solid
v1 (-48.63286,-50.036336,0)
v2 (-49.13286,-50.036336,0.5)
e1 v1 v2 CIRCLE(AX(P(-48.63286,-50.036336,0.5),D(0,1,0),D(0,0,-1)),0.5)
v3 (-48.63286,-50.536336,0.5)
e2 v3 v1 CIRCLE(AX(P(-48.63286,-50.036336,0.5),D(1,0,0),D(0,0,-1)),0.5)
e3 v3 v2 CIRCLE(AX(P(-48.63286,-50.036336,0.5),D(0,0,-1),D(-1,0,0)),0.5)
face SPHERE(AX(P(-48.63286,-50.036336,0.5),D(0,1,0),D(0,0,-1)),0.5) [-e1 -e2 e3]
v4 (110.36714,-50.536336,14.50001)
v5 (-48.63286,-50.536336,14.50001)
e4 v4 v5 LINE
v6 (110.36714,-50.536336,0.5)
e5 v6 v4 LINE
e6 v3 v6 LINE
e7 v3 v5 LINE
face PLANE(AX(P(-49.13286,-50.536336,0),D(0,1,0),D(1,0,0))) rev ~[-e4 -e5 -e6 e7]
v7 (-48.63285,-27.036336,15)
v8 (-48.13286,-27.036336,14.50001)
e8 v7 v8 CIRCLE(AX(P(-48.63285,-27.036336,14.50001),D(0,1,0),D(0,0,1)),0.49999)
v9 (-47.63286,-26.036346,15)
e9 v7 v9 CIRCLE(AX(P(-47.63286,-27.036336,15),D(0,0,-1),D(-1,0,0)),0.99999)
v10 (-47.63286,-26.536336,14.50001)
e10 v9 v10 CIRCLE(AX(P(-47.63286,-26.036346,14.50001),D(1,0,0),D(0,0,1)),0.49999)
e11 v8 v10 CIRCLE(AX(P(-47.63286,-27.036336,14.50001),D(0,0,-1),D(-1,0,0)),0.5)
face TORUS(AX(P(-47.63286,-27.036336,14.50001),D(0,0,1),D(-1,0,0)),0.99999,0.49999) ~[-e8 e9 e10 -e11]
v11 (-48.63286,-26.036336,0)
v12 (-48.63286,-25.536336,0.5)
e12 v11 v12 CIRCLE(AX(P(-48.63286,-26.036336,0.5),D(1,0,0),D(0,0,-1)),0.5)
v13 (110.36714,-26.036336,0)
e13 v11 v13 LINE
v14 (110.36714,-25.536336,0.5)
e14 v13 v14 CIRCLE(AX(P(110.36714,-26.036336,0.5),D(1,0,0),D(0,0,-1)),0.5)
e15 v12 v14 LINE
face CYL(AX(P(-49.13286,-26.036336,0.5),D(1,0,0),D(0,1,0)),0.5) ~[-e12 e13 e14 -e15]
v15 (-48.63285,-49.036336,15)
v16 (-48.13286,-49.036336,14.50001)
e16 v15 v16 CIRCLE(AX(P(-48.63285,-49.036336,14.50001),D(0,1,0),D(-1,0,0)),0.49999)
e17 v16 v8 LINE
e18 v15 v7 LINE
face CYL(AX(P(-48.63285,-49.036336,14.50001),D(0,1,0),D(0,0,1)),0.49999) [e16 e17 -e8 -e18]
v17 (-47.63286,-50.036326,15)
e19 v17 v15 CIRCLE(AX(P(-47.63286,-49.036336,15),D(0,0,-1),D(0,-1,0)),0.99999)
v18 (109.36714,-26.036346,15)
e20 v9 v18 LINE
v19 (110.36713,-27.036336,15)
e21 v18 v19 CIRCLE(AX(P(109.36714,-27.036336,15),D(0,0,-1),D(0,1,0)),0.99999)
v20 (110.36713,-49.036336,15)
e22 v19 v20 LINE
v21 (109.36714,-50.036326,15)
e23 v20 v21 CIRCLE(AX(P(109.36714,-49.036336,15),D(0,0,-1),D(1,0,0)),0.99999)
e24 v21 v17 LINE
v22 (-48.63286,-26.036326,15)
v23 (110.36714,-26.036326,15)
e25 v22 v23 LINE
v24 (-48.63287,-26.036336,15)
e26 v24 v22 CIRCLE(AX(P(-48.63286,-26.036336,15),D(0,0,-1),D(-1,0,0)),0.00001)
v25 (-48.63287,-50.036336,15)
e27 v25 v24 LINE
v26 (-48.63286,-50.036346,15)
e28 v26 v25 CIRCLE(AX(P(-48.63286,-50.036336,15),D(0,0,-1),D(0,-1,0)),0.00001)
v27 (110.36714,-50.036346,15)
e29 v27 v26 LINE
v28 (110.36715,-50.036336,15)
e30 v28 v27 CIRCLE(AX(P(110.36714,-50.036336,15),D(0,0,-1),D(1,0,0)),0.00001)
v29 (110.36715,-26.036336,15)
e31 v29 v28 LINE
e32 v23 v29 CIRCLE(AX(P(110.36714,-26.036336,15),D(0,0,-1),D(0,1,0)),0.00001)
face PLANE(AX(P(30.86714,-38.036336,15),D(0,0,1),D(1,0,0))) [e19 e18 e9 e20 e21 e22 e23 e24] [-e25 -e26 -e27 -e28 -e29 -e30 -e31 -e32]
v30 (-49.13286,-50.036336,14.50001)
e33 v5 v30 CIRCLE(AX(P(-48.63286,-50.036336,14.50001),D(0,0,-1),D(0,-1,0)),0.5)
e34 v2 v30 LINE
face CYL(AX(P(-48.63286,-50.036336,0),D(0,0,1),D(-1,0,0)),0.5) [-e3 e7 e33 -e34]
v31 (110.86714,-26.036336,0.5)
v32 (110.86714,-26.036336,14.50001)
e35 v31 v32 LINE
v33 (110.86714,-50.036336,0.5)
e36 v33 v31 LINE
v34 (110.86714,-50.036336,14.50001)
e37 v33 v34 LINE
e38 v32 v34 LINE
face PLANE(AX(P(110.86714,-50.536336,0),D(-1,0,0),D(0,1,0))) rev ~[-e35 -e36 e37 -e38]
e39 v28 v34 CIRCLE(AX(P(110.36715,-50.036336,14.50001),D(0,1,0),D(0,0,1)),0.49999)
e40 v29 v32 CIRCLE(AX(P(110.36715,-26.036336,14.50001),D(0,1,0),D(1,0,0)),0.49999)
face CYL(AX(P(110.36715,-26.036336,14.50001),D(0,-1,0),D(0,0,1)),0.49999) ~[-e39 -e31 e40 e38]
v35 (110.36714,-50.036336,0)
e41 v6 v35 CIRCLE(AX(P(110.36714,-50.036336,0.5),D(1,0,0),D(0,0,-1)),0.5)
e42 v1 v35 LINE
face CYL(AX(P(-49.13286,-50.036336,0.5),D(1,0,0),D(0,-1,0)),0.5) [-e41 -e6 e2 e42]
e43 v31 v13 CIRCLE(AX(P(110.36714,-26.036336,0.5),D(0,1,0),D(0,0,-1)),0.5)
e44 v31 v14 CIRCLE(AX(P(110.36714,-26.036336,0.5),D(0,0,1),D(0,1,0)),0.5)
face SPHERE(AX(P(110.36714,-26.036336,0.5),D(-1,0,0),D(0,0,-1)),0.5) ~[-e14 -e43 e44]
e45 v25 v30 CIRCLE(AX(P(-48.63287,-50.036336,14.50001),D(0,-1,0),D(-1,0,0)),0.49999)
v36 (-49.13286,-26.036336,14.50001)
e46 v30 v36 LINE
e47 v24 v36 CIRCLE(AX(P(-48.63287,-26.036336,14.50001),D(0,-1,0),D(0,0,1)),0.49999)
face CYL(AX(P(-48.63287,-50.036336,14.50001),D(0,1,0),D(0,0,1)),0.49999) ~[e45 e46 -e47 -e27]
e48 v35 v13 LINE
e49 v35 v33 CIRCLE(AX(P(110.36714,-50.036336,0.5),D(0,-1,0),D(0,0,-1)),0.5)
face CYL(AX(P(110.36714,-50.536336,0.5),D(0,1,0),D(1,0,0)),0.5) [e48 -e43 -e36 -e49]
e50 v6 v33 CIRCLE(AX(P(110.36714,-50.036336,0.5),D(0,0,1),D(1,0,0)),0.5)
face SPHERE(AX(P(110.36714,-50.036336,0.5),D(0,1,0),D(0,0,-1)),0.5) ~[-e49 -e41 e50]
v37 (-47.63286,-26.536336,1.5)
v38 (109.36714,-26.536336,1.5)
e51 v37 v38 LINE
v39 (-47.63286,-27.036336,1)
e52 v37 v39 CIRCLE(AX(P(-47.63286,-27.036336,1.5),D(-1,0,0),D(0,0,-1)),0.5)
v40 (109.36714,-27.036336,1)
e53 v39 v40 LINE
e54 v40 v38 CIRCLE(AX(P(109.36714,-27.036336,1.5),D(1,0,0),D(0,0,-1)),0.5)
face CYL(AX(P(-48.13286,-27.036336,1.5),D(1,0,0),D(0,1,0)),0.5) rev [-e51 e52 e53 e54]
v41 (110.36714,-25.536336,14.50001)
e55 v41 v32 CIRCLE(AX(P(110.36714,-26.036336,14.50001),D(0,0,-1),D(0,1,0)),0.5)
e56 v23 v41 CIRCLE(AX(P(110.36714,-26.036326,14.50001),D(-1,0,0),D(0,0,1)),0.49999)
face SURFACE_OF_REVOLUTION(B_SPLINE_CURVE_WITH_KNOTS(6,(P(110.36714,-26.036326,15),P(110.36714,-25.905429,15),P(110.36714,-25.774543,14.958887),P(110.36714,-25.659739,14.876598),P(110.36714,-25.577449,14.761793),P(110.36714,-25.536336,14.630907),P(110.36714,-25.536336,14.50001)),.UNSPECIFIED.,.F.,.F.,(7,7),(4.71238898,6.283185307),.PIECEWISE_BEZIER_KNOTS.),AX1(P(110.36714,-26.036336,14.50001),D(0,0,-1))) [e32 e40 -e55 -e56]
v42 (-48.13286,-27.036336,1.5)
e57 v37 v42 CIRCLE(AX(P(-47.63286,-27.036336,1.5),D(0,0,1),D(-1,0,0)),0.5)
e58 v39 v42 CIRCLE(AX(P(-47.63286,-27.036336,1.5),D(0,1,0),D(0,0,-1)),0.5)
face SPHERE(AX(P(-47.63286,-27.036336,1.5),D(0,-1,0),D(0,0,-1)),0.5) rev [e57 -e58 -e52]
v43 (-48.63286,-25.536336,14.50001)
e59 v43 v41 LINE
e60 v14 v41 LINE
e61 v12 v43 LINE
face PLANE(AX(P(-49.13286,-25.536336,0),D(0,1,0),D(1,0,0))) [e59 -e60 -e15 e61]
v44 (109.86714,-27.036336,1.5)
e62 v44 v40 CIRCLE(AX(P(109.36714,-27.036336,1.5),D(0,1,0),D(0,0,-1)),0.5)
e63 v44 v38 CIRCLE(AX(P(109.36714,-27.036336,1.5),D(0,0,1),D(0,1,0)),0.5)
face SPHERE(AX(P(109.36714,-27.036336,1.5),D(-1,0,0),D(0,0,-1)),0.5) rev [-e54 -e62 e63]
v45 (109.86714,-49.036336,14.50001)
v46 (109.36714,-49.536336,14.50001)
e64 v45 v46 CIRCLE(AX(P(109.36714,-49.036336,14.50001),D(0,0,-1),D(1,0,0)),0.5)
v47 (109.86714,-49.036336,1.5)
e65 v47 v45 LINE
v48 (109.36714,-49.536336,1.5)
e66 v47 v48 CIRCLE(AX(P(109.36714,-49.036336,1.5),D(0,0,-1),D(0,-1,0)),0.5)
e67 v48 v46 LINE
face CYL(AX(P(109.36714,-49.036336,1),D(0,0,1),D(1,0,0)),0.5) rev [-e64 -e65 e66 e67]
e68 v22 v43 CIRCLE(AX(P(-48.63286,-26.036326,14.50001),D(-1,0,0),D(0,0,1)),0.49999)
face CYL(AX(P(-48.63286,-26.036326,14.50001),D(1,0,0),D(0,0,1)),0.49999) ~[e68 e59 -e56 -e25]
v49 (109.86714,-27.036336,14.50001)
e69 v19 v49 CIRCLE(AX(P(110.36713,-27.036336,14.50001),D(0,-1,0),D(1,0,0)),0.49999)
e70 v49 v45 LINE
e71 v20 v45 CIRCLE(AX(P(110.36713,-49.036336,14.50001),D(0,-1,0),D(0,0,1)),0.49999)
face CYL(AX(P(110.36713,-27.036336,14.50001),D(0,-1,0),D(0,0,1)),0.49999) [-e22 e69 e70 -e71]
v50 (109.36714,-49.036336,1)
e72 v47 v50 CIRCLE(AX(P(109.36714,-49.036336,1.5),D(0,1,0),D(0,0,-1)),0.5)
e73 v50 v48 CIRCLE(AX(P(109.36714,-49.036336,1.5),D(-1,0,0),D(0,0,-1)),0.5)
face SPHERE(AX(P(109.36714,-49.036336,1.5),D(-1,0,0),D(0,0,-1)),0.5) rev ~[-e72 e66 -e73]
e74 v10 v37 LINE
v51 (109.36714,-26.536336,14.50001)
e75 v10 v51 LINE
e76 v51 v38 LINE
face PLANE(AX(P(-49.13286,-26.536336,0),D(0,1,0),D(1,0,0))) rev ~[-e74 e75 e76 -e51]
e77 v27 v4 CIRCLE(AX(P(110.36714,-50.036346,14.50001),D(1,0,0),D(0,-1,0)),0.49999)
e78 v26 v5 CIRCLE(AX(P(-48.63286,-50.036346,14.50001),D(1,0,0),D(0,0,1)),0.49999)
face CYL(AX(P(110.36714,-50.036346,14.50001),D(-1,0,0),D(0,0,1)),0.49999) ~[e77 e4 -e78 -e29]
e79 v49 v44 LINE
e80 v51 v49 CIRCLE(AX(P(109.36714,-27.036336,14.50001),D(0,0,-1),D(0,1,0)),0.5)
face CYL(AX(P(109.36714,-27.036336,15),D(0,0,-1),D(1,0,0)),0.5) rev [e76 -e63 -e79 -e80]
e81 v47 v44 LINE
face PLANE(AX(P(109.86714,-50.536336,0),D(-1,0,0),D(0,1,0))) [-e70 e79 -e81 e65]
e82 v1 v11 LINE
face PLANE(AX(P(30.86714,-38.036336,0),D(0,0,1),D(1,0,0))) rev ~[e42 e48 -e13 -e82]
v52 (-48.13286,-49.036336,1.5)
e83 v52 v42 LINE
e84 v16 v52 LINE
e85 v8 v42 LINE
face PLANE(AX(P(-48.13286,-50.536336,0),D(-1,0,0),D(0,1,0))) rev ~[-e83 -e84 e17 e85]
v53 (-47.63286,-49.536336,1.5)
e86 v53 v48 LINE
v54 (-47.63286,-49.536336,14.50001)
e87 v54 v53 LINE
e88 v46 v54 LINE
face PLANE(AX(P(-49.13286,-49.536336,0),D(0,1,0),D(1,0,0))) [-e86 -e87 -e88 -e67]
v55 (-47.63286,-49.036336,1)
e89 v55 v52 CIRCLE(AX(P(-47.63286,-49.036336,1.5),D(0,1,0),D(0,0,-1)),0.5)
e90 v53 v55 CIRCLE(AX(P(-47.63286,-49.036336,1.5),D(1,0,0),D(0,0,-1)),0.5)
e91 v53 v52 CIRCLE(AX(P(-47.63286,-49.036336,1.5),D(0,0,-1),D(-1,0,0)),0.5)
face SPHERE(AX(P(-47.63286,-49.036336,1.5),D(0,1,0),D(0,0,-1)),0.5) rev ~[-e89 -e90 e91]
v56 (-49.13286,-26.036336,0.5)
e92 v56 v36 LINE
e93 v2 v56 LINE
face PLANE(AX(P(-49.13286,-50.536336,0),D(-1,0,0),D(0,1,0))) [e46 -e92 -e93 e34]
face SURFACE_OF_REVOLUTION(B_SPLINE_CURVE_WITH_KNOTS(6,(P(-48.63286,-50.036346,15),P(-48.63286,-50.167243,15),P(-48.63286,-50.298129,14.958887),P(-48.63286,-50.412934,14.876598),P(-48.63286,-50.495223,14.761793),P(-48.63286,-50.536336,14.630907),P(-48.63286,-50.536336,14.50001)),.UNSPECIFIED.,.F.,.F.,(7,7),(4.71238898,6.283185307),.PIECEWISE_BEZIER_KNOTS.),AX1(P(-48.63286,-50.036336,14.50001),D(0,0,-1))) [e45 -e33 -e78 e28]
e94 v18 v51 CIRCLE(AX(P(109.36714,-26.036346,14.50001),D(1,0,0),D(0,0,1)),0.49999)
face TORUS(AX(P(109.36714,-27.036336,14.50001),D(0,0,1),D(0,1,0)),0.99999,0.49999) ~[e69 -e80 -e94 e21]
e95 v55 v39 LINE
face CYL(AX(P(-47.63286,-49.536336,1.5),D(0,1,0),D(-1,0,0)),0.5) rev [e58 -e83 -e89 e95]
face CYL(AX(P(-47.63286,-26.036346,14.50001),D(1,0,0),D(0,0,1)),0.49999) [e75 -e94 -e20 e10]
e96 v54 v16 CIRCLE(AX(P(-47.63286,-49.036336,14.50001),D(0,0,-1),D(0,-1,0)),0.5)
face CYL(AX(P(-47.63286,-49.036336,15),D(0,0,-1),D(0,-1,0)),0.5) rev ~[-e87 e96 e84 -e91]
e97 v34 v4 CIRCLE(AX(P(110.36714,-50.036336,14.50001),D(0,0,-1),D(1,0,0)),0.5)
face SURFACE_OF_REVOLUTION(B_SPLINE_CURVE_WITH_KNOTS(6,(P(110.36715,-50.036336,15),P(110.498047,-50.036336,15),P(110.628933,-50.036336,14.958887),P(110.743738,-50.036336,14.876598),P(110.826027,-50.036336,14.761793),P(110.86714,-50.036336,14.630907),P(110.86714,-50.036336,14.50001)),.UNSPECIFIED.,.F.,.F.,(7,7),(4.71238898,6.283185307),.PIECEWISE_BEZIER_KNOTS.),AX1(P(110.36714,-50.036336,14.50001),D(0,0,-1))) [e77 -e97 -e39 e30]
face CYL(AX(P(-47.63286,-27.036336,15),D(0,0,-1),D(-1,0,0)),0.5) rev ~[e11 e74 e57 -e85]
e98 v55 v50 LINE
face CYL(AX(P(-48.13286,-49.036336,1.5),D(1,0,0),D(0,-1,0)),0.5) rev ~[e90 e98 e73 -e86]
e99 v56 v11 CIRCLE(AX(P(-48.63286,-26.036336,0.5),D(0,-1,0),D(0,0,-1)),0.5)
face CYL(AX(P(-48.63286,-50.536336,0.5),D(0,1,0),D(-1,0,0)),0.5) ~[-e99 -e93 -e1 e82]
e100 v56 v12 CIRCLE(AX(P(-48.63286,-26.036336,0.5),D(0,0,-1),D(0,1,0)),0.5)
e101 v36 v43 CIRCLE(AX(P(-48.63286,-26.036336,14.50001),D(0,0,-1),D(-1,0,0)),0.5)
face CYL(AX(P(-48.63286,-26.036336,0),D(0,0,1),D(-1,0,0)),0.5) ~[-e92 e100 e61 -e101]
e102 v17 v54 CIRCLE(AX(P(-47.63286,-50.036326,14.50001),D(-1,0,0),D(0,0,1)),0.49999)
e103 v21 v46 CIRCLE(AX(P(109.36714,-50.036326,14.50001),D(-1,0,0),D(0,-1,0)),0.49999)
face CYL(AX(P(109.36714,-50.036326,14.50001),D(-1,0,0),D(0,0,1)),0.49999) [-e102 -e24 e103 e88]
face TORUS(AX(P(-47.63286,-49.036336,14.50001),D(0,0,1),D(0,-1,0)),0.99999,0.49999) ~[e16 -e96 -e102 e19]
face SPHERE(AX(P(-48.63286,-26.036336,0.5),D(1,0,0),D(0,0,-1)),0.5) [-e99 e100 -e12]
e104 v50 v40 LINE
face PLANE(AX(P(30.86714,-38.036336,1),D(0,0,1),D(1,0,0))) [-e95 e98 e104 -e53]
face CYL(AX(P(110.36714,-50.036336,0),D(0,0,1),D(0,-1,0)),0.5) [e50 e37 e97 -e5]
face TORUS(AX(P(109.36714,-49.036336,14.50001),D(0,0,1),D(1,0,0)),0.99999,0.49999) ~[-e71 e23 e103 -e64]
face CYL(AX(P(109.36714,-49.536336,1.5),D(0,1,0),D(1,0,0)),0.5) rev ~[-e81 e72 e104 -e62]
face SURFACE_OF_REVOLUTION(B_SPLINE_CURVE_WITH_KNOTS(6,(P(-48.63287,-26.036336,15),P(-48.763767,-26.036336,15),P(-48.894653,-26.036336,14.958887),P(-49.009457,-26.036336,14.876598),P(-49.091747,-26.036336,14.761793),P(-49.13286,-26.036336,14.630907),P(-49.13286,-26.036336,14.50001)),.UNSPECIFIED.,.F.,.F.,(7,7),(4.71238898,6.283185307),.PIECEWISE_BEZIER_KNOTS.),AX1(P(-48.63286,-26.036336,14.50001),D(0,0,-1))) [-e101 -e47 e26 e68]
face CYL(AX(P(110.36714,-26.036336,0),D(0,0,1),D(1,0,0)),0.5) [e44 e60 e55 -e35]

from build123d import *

# Parameters (mm, degrees)
F0_W     = 160
F0_H     = 25
F1_DEPTH = 15
F2_T     = -1
F3_R     = 0.5
F4_R     = 0.5
F5_R     = 0.49999


# Not quite as in the source:
# - a fillet or chamfer is up to 0.001 mm smaller than in the source, because OpenCascade refuses the exact size


with BuildPart() as f1:
    # F0 (on Top) → F1 (new body)
    with BuildSketch(Plane.XY):
        with Locations((30.8671402, -38.0363363773)):
            Rectangle(F0_W, F0_H)
    extrude(amount=F1_DEPTH)

    # F2
    f2_openings = [f1.faces().sort_by_distance(p)[0] for p in [
        (30.86714, -38.036336, 15),
    ]]
    offset(amount=F2_T, openings=f2_openings)

    # F3
    f3_edges = [f1.edges().sort_by_distance(p)[0] for p in [
        (30.86714, -25.536336, 0),
        (110.86714, -38.036336, 0),
        (-49.13286, -38.036336, 0),
        (30.86714, -50.536336, 0),
        (110.86714, -25.536336, 7.5),
        (-49.13286, -25.536336, 7.5),
        (-49.13286, -50.536336, 7.5),
        (110.86714, -50.536336, 7.5),
    ]]
    fillet(f3_edges, radius=F3_R)

    # F4
    f4_edges = [f1.edges().sort_by_distance(p)[0] for p in [
        (-48.13286, -38.036336, 1),
        (30.86714, -26.536336, 1),
        (30.86714, -49.536336, 1),
        (109.86714, -38.036336, 1),
        (-48.13286, -26.536336, 8),
        (-48.13286, -49.536336, 8),
        (109.86714, -26.536336, 8),
        (109.86714, -49.536336, 8),
    ]]
    fillet(f4_edges, radius=F4_R)

    # F5 (radius 0.5 in the source; OpenCascade refuses exactly that, so slightly less here)
    f5_edges = [f1.edges().sort_by_distance(p)[0] for p in [
        (30.86714, -25.536336, 15),
        (30.86714, -26.536336, 15),
        (30.86714, -49.536336, 15),
        (30.86714, -50.536336, 15),
        (109.86714, -38.036336, 15),
        (110.86714, -38.036336, 15),
        (-49.13286, -38.036336, 15),
        (-48.13286, -38.036336, 15),
        (-47.986413, -49.38989, 15),
        (-47.986413, -26.682783, 15),
        (-48.986413, -25.682783, 15),
        (-48.986413, -50.38989, 15),
        (109.720694, -26.682783, 15),
        (110.720694, -25.682783, 15),
        (109.720694, -49.38989, 15),
        (110.720694, -50.38989, 15),
    ]]
    fillet(f5_edges, radius=F5_R)


solid = f1.part
